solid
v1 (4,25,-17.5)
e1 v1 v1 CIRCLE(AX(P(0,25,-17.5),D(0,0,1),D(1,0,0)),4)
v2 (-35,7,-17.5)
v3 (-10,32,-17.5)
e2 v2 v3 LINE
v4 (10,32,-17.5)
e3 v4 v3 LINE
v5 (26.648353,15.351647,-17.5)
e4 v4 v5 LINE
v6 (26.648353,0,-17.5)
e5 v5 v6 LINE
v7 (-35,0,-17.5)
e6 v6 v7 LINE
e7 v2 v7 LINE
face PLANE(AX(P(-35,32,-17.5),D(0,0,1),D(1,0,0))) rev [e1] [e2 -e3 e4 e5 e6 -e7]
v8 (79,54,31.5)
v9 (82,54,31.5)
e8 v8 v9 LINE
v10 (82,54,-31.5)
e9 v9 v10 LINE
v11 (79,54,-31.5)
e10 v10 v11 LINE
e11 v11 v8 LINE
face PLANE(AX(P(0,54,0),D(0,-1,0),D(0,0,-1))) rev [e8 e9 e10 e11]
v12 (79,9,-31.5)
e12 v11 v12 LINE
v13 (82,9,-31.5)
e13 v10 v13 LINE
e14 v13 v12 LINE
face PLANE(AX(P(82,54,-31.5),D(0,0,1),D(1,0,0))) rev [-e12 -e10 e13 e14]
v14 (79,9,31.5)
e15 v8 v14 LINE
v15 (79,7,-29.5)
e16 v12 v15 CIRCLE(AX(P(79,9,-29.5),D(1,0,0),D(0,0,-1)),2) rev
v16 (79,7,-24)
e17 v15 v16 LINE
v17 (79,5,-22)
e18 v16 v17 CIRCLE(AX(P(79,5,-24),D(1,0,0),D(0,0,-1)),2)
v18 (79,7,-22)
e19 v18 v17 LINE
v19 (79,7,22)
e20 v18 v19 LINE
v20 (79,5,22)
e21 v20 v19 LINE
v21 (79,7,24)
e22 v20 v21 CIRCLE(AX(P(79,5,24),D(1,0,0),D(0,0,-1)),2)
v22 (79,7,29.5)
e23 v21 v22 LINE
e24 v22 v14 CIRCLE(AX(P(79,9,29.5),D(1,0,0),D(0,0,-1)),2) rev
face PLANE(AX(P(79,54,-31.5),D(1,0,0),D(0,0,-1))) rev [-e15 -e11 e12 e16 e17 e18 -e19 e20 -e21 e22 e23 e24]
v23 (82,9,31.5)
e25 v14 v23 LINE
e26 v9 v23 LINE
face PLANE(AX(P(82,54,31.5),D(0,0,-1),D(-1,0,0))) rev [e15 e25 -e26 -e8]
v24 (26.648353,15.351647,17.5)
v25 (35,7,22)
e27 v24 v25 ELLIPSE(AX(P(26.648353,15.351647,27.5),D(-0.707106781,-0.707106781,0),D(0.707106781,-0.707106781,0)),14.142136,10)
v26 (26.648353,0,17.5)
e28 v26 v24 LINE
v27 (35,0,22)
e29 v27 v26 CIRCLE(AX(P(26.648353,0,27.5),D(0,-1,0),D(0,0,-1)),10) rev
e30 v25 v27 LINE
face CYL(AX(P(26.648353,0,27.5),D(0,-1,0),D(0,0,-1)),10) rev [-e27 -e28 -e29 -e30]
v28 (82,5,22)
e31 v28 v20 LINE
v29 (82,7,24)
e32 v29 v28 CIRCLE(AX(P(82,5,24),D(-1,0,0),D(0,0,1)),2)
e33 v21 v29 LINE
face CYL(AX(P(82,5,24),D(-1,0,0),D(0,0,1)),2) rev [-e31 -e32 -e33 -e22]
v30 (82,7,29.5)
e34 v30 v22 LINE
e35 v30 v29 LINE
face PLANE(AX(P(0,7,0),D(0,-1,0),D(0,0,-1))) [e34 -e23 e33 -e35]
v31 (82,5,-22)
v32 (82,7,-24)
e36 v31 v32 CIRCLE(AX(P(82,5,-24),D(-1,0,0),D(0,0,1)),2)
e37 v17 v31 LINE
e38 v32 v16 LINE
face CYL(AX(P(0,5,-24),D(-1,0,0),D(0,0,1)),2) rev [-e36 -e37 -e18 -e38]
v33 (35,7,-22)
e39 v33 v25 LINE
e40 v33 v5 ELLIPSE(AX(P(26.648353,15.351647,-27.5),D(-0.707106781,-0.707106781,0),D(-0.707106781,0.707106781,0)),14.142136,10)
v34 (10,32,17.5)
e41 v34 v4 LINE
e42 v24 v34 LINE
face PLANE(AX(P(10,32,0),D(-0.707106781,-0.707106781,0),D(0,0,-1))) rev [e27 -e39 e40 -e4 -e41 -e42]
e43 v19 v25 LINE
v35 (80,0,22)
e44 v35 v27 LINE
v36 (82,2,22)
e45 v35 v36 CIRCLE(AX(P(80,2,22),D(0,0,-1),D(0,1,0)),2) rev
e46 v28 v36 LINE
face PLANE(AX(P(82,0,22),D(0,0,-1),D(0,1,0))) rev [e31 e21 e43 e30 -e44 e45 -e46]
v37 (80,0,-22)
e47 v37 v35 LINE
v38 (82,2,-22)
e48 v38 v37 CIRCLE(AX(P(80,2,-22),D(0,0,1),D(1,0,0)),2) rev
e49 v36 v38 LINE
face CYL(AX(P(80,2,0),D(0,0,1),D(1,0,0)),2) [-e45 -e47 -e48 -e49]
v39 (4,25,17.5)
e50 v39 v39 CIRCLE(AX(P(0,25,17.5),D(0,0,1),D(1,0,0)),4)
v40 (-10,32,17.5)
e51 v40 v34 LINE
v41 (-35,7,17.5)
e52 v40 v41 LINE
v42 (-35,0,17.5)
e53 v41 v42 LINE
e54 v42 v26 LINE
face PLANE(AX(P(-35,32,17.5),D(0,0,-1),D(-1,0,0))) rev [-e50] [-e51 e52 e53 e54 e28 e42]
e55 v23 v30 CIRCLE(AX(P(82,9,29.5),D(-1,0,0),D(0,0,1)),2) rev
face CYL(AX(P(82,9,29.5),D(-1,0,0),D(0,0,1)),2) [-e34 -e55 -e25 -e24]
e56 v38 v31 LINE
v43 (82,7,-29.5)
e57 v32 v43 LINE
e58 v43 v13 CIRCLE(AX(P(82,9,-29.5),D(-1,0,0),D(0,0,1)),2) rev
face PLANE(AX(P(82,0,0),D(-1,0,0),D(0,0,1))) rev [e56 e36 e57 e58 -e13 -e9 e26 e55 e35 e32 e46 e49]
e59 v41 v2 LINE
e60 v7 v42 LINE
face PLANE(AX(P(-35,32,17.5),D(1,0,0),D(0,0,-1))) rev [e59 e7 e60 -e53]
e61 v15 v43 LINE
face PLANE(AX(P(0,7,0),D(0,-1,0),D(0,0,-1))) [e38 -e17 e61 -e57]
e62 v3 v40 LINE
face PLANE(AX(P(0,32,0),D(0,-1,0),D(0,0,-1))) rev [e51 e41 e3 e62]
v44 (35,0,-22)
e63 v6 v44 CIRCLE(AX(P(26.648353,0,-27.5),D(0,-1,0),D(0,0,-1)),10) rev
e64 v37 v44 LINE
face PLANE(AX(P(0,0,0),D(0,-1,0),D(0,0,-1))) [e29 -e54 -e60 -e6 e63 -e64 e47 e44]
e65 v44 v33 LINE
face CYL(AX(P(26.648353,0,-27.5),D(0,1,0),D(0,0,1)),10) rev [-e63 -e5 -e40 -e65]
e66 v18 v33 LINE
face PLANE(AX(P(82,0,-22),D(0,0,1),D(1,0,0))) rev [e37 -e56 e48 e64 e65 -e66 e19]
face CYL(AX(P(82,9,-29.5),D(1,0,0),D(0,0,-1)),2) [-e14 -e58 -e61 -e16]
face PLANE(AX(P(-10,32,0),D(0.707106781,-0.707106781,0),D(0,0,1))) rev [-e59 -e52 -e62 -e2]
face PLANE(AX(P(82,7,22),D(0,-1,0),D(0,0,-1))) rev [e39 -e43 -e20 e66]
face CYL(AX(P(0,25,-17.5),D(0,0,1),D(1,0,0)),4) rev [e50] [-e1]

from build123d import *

# Parameters (mm, degrees)
SKETCH1_W           = 70
SKETCH1_H           = 35
BOSS_EXTRUDE1_DEPTH = 32
SKETCH2_R           = 4
CUT_EXTRUDE1_DEPTH  = 59.940648113
CHAMFER1_SIZE       = 25
SKETCH3_W           = 44
SKETCH3_H           = 7
BOSS_EXTRUDE2_DEPTH = 47
FILLET1_R           = 10
FILLET2_R           = 10
SKETCH4_W           = 3
SKETCH4_H           = 63
BOSS_EXTRUDE3_DEPTH = 47
FILLET3_R           = 2


with BuildPart() as part:
    # Sketch1 → Boss-Extrude1 (new body)
    with BuildSketch(Plane(origin=(0, 0, 0), x_dir=(1, 0, 0), z_dir=(0, 1, 0))):
        Rectangle(SKETCH1_W, SKETCH1_H)
    extrude(amount=BOSS_EXTRUDE1_DEPTH)

    # Sketch2 → Cut-Extrude1 (cut, through all)
    with BuildSketch(Plane.XY.offset(17.5)):
        with Locations((0, 25)):
            Circle(SKETCH2_R)
    extrude(amount=-CUT_EXTRUDE1_DEPTH, mode=Mode.SUBTRACT)

    # Chamfer1
    chamfer1_edges = [part.edges().sort_by_distance(p)[0] for p in [
        (-35, 32, 0),
        (35, 32, 0),
    ]]
    chamfer(chamfer1_edges, length=CHAMFER1_SIZE)

    # Sketch3 → Boss-Extrude2 (add)
    with BuildSketch(Plane(origin=(35, 0, 0), x_dir=(0, 0, -1), z_dir=(1, 0, 0))):
        with Locations((0, 3.5)):
            Rectangle(SKETCH3_W, SKETCH3_H)
    extrude(amount=BOSS_EXTRUDE2_DEPTH)

    # Fillet1
    # the kernel refuses this fillet: 10 mm, written as the material it adds along each edge
    with BuildSketch(Plane(origin=(35, 0, -17.5), x_dir=(-1.5347723092402642e-12, 0, -1.0), z_dir=(0, 1, 0))) as fillet1_piece_1_section:
        with BuildLine():
            CenterArc((10, 8.351646544), FILLET1_R, 180, 56.632987031)
            Line((0, 8.351646544), (-0.2, 8.351646544))
            Line((-0.2, 8.351646544), (-0.2, 0))
            Line((-0.2, 0), (0, -0.2))
            ThreePointArc((0, -0.2), (2.25, -0.2), (4.39, -0.167032931))
            Line((4.39, -0.167032931), (4.5, 0))
        make_face()
    fillet1_piece_1 = extrude(amount=7, mode=Mode.PRIVATE)
    fillet1_piece_1 = split(fillet1_piece_1, bisect_by=Plane(origin=(35.692594852, 6.307405148, -18.660307251), z_dir=(-0.7071067811865476, -0.7071067811865476, 0)), keep=Keep.TOP, mode=Mode.PRIVATE)
    add(fillet1_piece_1)
    with BuildSketch(Plane(origin=(35, 0, -17.5), x_dir=(-1.5347723092402642e-12, 0, -1.0), z_dir=(0, 1, 0))) as fillet1_piece_2_section:
        with BuildLine():
            CenterArc((10, 8.351646544), FILLET1_R, 180, 56.632987031)
            Line((0, 8.351646544), (-0.2, 8.351646544))
            Line((-0.2, 8.351646544), (-0.2, 0))
            Line((-0.2, 0), (0, -0.2))
            ThreePointArc((0, -0.2), (2.25, -0.2), (4.39, -0.167032931))
            Line((4.39, -0.167032931), (4.5, 0))
        make_face()
    fillet1_piece_2 = extrude(amount=27.879116361, mode=Mode.PRIVATE)
    fillet1_piece_2 = split(fillet1_piece_2, bisect_by=Plane(origin=(31.191797934, 7, -18.092333784), z_dir=(0, 1, 0)), keep=Keep.TOP, mode=Mode.PRIVATE)
    fillet1_piece_2 = split(fillet1_piece_2, bisect_by=Plane(origin=(32.143848451, 9.856151549, -18.092333784), z_dir=(-0.7071067811865476, -0.7071067811865476, 0)), keep=Keep.TOP, mode=Mode.PRIVATE)
    add(fillet1_piece_2)
    with BuildSketch(Plane(origin=(35, 0, -17.5), x_dir=(-1.5347723092402642e-12, 0, -1.0), z_dir=(0, 1, 0))) as fillet1_piece_3_section:
        with BuildLine():
            CenterArc((10, 8.351646544), FILLET1_R, 180, 56.632987031)
            Line((0, 8.351646544), (-0.2, 8.351646544))
            Line((-0.2, 8.351646544), (-0.2, 0))
            Line((-0.2, 0), (0, -0.2))
            ThreePointArc((0, -0.2), (2.25, -0.2), (4.39, -0.167032931))
            Line((4.39, -0.167032931), (4.5, 0))
        make_face()
    fillet1_piece_3 = extrude(amount=7, mode=Mode.PRIVATE)
    fillet1_piece_3 = split(fillet1_piece_3, bisect_by=Plane(origin=(35.097400014, 6.902599986, -19.555271065), z_dir=(0.7071067811865476, 0.7071067811865476, 0)), keep=Keep.TOP, mode=Mode.PRIVATE)
    add(fillet1_piece_3)

    # Fillet2
    # the kernel refuses this fillet: 10 mm, written as the material it adds along each edge
    with BuildSketch(Plane(origin=(35, 0, 17.5), x_dir=(-1.5331933253830236e-12, 0, 1.0), z_dir=(0, 1, 0))) as fillet2_piece_1_section:
        with BuildLine():
            CenterArc((10, -8.351646544), FILLET2_R, 123.367012969, 56.632987031)
            Line((0, -8.351646544), (-0.2, -8.351646544))
            Line((-0.2, -8.351646544), (-0.2, 0))
            Line((-0.2, 0), (0, 0.2))
            ThreePointArc((0, 0.2), (2.25, 0.2), (4.39, 0.167032931))
            Line((4.39, 0.167032931), (4.5, 0))
        make_face()
    fillet2_piece_1 = extrude(amount=7, mode=Mode.PRIVATE)
    fillet2_piece_1 = split(fillet2_piece_1, bisect_by=Plane(origin=(35.692594852, 6.307405148, 18.660307251), z_dir=(-0.7071067811865476, -0.7071067811865476, 0)), keep=Keep.TOP, mode=Mode.PRIVATE)
    add(fillet2_piece_1)
    with BuildSketch(Plane(origin=(35, 0, 17.5), x_dir=(-1.5331933253830236e-12, 0, 1.0), z_dir=(0, 1, 0))) as fillet2_piece_2_section:
        with BuildLine():
            CenterArc((10, -8.351646544), FILLET2_R, 123.367012969, 56.632987031)
            Line((0, -8.351646544), (-0.2, -8.351646544))
            Line((-0.2, -8.351646544), (-0.2, 0))
            Line((-0.2, 0), (0, 0.2))
            ThreePointArc((0, 0.2), (2.25, 0.2), (4.39, 0.167032931))
            Line((4.39, 0.167032931), (4.5, 0))
        make_face()
    fillet2_piece_2 = extrude(amount=27.879116361, mode=Mode.PRIVATE)
    fillet2_piece_2 = split(fillet2_piece_2, bisect_by=Plane(origin=(31.191797934, 7, 18.092333784), z_dir=(0, 1, 0)), keep=Keep.TOP, mode=Mode.PRIVATE)
    fillet2_piece_2 = split(fillet2_piece_2, bisect_by=Plane(origin=(32.143848451, 9.856151549, 18.092333784), z_dir=(-0.7071067811865476, -0.7071067811865476, 0)), keep=Keep.TOP, mode=Mode.PRIVATE)
    add(fillet2_piece_2)
    with BuildSketch(Plane(origin=(35, 0, 17.5), x_dir=(-1.5331933253830236e-12, 0, 1.0), z_dir=(0, 1, 0))) as fillet2_piece_3_section:
        with BuildLine():
            CenterArc((10, -8.351646544), FILLET2_R, 123.367012969, 56.632987031)
            Line((0, -8.351646544), (-0.2, -8.351646544))
            Line((-0.2, -8.351646544), (-0.2, 0))
            Line((-0.2, 0), (0, 0.2))
            ThreePointArc((0, 0.2), (2.25, 0.2), (4.39, 0.167032931))
            Line((4.39, 0.167032931), (4.5, 0))
        make_face()
    fillet2_piece_3 = extrude(amount=7, mode=Mode.PRIVATE)
    fillet2_piece_3 = split(fillet2_piece_3, bisect_by=Plane(origin=(35.097400014, 6.902599986, 19.555271065), z_dir=(0.7071067811865476, 0.7071067811865476, 0)), keep=Keep.TOP, mode=Mode.PRIVATE)
    add(fillet2_piece_3)

    # Sketch4 → Boss-Extrude3 (add)
    with BuildSketch(Plane(origin=(0, 7, 0), x_dir=(1, 0, 0), z_dir=(0, 1, 0))):
        with Locations((80.5, 0)):
            Rectangle(SKETCH4_W, SKETCH4_H)
    extrude(amount=BOSS_EXTRUDE3_DEPTH)

    # Fillet3
    fillet3_edges = [part.edges().sort_by_distance(p)[0] for p in [
        (80.5, 7, 22),
        (80.5, 7, -22),
        (82, 0, 0),
        (80.5, 7, -31.5),
        (80.5, 7, 31.5),
    ]]
    fillet(fillet3_edges, radius=FILLET3_R)


solid = part.part
